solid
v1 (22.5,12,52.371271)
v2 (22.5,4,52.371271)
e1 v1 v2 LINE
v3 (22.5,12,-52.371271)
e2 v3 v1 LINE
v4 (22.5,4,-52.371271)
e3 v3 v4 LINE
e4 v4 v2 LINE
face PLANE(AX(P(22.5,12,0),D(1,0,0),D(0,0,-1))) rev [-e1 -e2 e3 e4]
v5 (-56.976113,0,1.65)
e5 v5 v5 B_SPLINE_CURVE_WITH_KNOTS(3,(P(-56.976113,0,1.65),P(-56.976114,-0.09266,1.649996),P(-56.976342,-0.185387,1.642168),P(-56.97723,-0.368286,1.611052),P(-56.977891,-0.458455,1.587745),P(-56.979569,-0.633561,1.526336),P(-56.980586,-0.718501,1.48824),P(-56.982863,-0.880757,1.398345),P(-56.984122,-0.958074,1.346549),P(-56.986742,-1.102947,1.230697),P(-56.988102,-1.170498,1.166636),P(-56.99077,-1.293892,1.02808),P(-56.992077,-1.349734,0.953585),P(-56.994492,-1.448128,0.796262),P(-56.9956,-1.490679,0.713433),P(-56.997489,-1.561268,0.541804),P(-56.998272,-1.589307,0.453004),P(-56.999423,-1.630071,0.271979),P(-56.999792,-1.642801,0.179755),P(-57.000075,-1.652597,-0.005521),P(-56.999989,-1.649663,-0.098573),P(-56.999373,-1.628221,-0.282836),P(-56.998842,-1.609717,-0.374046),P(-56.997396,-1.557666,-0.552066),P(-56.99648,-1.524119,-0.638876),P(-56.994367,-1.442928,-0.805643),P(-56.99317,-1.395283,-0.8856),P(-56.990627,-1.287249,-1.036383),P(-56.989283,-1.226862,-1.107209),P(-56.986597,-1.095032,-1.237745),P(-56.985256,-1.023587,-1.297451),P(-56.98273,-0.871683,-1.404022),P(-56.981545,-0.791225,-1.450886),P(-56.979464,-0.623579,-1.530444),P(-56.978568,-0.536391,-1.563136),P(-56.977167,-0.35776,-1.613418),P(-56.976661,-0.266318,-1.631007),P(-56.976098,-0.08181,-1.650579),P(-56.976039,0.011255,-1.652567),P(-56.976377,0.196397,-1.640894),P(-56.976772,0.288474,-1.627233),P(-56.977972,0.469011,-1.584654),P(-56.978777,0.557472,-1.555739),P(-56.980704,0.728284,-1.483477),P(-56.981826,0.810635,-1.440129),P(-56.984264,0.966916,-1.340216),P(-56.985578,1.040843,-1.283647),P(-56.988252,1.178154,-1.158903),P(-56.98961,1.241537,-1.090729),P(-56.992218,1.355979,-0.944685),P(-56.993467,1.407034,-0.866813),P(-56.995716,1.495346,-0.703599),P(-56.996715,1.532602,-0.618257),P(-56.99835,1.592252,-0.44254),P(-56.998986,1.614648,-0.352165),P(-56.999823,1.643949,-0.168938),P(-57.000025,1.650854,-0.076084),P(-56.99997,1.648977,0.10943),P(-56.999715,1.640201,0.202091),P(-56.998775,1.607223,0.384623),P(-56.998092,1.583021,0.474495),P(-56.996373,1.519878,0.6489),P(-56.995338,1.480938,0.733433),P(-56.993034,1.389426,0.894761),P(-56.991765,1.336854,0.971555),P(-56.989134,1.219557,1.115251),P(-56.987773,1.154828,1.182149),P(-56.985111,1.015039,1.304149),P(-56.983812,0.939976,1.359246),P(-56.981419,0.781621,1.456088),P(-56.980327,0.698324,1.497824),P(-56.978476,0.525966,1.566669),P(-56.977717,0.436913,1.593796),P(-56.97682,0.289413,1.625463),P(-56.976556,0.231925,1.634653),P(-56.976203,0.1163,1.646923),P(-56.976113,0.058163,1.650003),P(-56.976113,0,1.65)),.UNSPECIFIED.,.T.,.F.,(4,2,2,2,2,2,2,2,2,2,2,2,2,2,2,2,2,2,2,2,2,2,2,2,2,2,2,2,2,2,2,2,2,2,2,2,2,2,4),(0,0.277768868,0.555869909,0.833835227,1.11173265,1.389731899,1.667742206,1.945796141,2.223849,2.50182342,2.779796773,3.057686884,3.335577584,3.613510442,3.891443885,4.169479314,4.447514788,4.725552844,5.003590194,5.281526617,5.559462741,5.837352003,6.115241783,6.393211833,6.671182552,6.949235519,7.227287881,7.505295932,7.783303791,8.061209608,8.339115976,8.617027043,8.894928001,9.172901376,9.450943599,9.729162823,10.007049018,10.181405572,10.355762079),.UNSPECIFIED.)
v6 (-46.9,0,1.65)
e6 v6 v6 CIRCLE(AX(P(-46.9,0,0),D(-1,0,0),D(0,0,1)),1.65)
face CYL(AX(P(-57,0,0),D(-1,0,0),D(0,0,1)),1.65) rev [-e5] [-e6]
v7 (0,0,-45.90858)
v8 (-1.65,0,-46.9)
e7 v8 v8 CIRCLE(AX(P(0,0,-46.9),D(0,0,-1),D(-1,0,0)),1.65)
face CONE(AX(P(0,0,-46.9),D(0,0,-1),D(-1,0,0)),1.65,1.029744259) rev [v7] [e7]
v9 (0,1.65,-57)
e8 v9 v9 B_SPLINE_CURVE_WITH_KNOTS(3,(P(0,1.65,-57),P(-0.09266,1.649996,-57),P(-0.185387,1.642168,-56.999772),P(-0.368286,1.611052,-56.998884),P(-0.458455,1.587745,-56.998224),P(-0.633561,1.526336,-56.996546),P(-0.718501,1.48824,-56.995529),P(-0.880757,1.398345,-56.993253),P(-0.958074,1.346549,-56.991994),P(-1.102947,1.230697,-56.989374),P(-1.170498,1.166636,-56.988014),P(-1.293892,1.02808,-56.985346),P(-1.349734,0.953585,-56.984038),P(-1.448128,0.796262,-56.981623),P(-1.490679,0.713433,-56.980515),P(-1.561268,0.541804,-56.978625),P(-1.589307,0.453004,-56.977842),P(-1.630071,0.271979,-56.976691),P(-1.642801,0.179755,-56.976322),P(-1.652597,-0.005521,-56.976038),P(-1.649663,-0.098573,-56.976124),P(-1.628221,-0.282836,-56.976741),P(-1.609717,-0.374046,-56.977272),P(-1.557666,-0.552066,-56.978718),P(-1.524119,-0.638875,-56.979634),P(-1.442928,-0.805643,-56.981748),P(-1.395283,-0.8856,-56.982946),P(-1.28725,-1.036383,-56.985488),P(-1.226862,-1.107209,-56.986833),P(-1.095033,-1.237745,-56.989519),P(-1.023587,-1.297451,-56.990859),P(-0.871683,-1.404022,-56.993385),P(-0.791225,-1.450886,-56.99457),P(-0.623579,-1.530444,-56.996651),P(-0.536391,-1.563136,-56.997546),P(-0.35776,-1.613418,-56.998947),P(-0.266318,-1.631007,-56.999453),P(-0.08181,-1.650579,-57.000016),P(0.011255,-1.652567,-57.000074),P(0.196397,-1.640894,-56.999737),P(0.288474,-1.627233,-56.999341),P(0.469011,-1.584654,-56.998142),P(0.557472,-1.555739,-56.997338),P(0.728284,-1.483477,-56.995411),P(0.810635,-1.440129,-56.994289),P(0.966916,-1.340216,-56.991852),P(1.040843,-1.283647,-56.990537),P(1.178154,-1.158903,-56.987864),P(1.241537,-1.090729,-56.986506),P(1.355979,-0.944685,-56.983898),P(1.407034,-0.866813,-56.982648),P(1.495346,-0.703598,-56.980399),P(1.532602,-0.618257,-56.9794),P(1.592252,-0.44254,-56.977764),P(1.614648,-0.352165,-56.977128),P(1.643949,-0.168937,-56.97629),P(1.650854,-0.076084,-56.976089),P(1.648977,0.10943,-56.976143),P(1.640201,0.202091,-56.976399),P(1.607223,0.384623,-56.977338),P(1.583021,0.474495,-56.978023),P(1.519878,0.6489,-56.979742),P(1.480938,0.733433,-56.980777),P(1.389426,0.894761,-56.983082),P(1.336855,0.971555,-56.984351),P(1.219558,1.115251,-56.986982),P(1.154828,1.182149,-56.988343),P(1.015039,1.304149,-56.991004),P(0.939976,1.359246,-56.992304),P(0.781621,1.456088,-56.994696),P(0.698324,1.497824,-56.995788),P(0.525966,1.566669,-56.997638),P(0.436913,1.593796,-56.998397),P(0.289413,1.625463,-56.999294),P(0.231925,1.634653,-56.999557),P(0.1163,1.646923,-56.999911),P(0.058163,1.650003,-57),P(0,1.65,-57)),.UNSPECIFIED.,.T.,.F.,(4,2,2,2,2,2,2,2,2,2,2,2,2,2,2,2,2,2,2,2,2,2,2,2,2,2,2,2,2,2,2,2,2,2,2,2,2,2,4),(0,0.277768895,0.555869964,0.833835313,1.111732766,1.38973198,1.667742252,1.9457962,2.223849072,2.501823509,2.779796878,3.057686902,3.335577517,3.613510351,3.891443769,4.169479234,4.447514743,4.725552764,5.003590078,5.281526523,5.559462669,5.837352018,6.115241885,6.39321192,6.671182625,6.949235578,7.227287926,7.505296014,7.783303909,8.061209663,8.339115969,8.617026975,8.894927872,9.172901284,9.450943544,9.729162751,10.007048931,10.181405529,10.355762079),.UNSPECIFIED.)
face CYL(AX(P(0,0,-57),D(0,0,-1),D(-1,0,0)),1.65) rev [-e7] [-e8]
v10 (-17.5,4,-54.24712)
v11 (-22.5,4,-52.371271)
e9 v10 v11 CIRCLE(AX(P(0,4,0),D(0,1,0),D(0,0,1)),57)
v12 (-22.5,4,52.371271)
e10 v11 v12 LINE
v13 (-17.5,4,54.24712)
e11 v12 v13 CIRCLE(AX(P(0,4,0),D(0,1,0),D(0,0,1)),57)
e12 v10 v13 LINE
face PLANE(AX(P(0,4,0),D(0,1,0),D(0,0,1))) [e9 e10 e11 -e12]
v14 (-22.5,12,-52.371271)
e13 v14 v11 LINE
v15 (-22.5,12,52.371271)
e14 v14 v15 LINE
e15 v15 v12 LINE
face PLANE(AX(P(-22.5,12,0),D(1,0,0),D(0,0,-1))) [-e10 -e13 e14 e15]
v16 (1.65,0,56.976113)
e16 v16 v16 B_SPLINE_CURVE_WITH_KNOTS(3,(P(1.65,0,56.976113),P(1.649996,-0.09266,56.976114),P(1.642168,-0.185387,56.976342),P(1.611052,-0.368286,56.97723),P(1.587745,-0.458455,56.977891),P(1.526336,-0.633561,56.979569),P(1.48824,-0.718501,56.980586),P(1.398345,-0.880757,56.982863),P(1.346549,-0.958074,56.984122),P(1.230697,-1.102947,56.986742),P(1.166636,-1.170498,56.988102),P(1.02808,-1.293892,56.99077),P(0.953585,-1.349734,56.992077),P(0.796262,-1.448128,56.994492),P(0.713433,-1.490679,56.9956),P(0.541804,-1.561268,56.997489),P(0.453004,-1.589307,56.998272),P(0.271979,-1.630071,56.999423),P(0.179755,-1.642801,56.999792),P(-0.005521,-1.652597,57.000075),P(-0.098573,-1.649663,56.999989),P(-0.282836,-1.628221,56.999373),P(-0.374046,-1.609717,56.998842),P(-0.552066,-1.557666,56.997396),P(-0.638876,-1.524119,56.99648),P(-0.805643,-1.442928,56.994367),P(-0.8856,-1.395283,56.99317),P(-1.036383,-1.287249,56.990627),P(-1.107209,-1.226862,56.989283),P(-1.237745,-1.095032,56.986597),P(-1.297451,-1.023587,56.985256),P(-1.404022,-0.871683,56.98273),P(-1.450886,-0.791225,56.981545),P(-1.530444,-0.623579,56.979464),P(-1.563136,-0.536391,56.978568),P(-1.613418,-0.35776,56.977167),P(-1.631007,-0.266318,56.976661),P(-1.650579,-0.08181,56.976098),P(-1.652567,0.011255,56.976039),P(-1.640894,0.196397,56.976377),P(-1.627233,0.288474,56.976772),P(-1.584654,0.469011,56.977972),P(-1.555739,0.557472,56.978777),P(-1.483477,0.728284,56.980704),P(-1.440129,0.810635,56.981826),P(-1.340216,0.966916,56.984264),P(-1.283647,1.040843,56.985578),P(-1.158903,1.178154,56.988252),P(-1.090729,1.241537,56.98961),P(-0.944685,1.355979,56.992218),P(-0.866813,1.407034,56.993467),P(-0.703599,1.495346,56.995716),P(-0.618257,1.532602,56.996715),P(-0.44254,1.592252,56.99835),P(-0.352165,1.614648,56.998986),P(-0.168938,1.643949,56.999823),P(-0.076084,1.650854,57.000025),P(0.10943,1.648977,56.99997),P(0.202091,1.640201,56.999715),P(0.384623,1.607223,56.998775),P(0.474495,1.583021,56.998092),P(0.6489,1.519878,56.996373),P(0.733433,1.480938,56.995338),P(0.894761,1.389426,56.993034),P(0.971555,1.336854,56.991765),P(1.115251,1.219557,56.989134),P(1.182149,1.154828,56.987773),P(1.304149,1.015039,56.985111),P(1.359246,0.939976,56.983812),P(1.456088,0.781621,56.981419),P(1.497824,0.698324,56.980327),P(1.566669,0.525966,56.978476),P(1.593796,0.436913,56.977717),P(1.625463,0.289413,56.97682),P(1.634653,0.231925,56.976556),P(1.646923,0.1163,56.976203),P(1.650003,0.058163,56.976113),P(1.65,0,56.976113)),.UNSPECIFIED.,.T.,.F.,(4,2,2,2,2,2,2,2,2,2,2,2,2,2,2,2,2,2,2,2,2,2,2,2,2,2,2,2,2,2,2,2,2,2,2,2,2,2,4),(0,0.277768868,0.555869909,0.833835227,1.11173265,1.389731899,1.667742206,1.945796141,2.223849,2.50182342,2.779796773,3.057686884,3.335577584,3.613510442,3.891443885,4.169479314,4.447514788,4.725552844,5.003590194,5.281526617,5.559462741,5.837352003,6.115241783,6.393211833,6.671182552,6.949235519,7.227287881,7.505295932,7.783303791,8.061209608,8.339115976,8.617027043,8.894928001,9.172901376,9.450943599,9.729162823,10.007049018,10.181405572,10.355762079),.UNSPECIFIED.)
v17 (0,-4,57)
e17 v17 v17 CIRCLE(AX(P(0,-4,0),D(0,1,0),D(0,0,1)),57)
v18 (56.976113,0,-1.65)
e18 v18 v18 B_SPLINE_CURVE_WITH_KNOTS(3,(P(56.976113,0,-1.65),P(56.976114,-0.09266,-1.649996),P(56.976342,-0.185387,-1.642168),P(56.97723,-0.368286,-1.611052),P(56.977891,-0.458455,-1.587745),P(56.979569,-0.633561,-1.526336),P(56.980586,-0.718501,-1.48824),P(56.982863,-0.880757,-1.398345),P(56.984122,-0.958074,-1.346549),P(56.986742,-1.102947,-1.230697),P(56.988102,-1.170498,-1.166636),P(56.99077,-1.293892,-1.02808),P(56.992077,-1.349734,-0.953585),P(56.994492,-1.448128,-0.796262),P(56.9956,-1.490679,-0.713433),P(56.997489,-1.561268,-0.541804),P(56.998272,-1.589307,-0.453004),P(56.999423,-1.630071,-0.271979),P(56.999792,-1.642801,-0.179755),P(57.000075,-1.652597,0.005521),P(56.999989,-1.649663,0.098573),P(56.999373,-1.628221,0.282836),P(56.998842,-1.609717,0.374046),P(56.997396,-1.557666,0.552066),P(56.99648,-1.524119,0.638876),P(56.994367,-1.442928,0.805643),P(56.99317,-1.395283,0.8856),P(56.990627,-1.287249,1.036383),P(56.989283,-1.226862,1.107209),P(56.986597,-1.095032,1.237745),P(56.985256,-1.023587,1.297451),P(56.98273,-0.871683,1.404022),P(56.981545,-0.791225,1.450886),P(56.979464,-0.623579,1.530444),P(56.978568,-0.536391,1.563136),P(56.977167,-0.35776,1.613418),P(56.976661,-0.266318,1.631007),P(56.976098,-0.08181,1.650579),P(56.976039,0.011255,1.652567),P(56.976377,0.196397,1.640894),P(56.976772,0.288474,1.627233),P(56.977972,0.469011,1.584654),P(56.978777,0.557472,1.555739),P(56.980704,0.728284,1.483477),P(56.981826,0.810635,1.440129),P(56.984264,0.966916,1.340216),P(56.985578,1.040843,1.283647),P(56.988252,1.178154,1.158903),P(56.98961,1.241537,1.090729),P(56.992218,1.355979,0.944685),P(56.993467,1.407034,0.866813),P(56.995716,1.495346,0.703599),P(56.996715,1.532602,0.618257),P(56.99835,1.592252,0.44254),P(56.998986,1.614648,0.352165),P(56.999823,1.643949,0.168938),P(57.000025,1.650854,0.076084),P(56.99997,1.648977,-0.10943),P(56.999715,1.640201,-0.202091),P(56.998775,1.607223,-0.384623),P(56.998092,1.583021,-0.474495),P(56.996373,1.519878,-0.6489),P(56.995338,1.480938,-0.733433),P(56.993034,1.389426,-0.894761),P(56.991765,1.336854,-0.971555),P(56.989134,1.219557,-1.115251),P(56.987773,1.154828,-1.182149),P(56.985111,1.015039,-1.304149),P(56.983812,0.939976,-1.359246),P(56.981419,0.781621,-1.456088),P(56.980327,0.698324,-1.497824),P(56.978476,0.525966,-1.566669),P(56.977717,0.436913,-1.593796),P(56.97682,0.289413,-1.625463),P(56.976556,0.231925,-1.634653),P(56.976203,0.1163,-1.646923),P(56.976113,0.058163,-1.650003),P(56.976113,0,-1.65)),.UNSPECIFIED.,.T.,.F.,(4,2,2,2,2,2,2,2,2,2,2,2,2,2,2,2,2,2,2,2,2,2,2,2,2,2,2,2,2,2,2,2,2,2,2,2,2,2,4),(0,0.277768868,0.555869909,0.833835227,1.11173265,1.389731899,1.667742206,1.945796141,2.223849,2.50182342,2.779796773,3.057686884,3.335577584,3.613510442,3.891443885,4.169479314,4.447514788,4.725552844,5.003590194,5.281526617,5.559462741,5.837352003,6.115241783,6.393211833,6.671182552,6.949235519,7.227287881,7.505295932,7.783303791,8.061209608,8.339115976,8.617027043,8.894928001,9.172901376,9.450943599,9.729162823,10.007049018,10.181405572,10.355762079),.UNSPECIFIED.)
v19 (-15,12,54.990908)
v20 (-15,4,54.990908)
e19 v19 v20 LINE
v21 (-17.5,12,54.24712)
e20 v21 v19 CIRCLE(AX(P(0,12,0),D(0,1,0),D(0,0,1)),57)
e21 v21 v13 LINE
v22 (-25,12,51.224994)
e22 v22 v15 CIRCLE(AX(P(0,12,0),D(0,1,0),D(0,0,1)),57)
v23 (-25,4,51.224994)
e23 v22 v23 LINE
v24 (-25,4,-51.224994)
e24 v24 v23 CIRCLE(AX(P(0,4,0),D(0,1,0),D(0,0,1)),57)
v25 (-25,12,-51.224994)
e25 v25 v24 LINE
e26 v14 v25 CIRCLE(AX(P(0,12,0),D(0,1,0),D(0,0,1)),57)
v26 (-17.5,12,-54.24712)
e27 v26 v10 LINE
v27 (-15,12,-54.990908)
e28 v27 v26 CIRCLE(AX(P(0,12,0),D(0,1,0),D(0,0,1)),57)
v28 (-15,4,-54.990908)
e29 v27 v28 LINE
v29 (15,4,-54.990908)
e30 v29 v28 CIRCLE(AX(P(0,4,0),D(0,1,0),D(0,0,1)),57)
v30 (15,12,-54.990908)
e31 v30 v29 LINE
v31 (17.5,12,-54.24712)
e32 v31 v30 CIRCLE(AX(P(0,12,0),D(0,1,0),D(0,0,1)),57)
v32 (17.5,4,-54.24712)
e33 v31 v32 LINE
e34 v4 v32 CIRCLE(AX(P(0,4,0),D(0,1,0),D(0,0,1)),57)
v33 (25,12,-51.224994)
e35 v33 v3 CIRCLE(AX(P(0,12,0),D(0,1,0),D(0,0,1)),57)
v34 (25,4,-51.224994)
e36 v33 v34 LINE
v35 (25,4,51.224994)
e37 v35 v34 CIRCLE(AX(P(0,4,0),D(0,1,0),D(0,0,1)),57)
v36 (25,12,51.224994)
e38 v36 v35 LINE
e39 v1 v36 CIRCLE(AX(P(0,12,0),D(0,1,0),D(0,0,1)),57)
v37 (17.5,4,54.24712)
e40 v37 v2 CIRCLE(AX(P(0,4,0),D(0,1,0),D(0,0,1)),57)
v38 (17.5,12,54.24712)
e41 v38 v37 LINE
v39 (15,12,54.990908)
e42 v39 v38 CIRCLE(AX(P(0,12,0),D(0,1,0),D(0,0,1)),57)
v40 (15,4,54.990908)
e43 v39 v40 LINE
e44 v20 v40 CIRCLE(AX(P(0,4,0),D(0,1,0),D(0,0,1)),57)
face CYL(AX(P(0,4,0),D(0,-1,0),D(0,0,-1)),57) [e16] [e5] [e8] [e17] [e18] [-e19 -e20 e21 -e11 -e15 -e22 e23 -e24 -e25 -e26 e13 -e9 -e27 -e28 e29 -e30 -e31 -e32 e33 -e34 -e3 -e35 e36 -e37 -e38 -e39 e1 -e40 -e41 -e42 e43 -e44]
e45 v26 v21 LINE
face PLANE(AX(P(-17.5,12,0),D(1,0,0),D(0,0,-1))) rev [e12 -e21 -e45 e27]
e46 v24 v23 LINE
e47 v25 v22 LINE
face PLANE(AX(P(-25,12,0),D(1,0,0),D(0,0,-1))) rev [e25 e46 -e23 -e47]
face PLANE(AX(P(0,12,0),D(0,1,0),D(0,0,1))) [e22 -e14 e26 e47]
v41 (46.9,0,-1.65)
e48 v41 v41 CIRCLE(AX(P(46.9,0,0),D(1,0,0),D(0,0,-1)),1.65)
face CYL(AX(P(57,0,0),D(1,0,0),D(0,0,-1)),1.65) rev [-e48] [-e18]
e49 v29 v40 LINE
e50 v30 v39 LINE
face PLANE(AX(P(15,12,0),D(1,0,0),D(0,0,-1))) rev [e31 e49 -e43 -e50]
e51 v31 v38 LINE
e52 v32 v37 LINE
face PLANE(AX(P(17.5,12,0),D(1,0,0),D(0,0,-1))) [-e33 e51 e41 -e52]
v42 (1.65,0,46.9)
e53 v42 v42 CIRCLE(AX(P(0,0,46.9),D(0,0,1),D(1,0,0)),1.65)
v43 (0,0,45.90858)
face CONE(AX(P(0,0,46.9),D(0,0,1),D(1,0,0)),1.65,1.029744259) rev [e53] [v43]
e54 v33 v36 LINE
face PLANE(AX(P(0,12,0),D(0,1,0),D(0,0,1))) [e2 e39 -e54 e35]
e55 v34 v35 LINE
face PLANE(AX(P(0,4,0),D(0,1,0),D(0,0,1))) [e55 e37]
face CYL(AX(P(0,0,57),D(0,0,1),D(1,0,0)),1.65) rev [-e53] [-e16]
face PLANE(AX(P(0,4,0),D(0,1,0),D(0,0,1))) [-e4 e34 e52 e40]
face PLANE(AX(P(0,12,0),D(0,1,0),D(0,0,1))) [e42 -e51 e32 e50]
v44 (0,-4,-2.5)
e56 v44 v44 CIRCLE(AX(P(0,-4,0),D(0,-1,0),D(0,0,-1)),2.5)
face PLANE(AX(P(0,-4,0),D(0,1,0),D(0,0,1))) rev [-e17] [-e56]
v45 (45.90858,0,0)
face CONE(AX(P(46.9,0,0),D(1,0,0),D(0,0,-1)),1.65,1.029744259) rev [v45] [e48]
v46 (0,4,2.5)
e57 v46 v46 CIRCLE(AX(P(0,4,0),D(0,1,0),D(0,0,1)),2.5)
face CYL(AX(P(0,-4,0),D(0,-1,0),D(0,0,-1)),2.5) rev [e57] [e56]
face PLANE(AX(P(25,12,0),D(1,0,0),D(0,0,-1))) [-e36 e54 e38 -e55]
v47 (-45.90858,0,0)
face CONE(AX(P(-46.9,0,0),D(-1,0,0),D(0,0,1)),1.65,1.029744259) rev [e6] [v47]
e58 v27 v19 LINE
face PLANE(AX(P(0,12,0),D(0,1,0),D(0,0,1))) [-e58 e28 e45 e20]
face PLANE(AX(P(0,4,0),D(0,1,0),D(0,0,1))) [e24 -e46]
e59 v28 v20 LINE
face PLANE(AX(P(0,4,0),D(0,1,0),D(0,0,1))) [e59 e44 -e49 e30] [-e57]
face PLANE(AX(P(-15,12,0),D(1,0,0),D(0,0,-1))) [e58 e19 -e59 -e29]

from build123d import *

# Parameters (mm, degrees)
SKETCH1_R           = 57
BOSS_EXTRUDE1_DEPTH = 4
BOSS_EXTRUDE2_START = 8
BOSS_EXTRUDE2_DEPTH = 8
M6_TAPPED_HOLE1_D   = 5


# Read off the part's stored shape, not the designer's step: M4 Tapped Hole1
with BuildPart() as part:
    # Sketch1 → Boss-Extrude1 (new, symmetric)
    with BuildSketch(Plane(origin=(0, 0, 0), x_dir=(1, 0, 0), z_dir=(0, 1, 0))):
        with Locations(Location((0, 0, 0), (0, 0, 270))):
            Circle(SKETCH1_R)
    extrude(amount=BOSS_EXTRUDE1_DEPTH, both=True)

    # Sketch2 → Boss-Extrude2 (add)
    with BuildSketch(Plane(origin=(0, 4, 0), x_dir=(1, 0, 0), z_dir=(0, 1, 0)).offset(BOSS_EXTRUDE2_START)):
        with BuildLine():
            Line((-22.5, -52.37127075), (-22.5, 52.37127075))
            ThreePointArc((-22.5, 52.37127075), (-23.756914523, 51.81321272), (-25, 51.224993899))
            Line((-25, 51.224993899), (-25, -51.224993899))
            ThreePointArc((-25, -51.224993899), (-23.756914523, -51.81321272), (-22.5, -52.37127075))
        make_face()
        with BuildLine():
            ThreePointArc((-15, 54.990908339), (-16.254254993, 54.633315794), (-17.5, 54.247119739))
            Line((-17.5, 54.247119739), (-17.5, -54.247119739))
            ThreePointArc((-17.5, -54.247119739), (-16.254254993, -54.633315794), (-15, -54.990908339))
            Line((-15, -54.990908339), (-15, 54.990908339))
        make_face()
        with BuildLine():
            Line((25, -51.224993899), (25, 51.224993899))
            ThreePointArc((25, 51.224993899), (23.756914523, 51.81321272), (22.5, 52.37127075))
            Line((22.5, 52.37127075), (22.5, -52.37127075))
            ThreePointArc((22.5, -52.37127075), (23.756914523, -51.81321272), (25, -51.224993899))
        make_face()
        with BuildLine():
            ThreePointArc((17.5, 54.247119739), (16.254254993, 54.633315794), (15, 54.990908339))
            Line((15, 54.990908339), (15, -54.990908339))
            ThreePointArc((15, -54.990908339), (16.254254993, -54.633315794), (17.5, -54.247119739))
            Line((17.5, -54.247119739), (17.5, 54.247119739))
        make_face()
    extrude(amount=-BOSS_EXTRUDE2_DEPTH)

    # M6 Tapped Hole1 (through all)
    with Locations(Plane(origin=(0, -4, 0), x_dir=(-1, 0, 0), z_dir=(0, -1, 0))):
        with Locations((0, 0)):
            Hole(M6_TAPPED_HOLE1_D / 2)

    # M4 Tapped Hole1 outline → M4 Tapped Hole1 (revolve, cut)
    with BuildSketch(Plane.XZ):
        Polygon((1.65, -57.000012834), (1.65, -46.9), (0, -45.908579979), (0, -57.000012834), align=None)
        Polygon((0, 57.000003302), (0, 45.908579979), (1.65, 46.9), (1.65, 57.000003302), align=None)
    revolve(axis=Axis((0, 0, 0), (0, 0, 1)), mode=Mode.SUBTRACT)

    # M4 Tapped Hole1 2 outline → M4 Tapped Hole1 2 (revolve, cut)
    with BuildSketch(Plane.YX):
        Polygon((0, 45.908579979), (1.65, 46.9), (1.65, 57.000003302), (0, 57.000003302), align=None)
        Polygon((1.65, -46.9), (0, -45.908579979), (0, -57.000003302), (1.65, -57.000003302), align=None)
    revolve(axis=Axis((0, 0, 0), (1, 0, 0)), mode=Mode.SUBTRACT)


solid = part.part
